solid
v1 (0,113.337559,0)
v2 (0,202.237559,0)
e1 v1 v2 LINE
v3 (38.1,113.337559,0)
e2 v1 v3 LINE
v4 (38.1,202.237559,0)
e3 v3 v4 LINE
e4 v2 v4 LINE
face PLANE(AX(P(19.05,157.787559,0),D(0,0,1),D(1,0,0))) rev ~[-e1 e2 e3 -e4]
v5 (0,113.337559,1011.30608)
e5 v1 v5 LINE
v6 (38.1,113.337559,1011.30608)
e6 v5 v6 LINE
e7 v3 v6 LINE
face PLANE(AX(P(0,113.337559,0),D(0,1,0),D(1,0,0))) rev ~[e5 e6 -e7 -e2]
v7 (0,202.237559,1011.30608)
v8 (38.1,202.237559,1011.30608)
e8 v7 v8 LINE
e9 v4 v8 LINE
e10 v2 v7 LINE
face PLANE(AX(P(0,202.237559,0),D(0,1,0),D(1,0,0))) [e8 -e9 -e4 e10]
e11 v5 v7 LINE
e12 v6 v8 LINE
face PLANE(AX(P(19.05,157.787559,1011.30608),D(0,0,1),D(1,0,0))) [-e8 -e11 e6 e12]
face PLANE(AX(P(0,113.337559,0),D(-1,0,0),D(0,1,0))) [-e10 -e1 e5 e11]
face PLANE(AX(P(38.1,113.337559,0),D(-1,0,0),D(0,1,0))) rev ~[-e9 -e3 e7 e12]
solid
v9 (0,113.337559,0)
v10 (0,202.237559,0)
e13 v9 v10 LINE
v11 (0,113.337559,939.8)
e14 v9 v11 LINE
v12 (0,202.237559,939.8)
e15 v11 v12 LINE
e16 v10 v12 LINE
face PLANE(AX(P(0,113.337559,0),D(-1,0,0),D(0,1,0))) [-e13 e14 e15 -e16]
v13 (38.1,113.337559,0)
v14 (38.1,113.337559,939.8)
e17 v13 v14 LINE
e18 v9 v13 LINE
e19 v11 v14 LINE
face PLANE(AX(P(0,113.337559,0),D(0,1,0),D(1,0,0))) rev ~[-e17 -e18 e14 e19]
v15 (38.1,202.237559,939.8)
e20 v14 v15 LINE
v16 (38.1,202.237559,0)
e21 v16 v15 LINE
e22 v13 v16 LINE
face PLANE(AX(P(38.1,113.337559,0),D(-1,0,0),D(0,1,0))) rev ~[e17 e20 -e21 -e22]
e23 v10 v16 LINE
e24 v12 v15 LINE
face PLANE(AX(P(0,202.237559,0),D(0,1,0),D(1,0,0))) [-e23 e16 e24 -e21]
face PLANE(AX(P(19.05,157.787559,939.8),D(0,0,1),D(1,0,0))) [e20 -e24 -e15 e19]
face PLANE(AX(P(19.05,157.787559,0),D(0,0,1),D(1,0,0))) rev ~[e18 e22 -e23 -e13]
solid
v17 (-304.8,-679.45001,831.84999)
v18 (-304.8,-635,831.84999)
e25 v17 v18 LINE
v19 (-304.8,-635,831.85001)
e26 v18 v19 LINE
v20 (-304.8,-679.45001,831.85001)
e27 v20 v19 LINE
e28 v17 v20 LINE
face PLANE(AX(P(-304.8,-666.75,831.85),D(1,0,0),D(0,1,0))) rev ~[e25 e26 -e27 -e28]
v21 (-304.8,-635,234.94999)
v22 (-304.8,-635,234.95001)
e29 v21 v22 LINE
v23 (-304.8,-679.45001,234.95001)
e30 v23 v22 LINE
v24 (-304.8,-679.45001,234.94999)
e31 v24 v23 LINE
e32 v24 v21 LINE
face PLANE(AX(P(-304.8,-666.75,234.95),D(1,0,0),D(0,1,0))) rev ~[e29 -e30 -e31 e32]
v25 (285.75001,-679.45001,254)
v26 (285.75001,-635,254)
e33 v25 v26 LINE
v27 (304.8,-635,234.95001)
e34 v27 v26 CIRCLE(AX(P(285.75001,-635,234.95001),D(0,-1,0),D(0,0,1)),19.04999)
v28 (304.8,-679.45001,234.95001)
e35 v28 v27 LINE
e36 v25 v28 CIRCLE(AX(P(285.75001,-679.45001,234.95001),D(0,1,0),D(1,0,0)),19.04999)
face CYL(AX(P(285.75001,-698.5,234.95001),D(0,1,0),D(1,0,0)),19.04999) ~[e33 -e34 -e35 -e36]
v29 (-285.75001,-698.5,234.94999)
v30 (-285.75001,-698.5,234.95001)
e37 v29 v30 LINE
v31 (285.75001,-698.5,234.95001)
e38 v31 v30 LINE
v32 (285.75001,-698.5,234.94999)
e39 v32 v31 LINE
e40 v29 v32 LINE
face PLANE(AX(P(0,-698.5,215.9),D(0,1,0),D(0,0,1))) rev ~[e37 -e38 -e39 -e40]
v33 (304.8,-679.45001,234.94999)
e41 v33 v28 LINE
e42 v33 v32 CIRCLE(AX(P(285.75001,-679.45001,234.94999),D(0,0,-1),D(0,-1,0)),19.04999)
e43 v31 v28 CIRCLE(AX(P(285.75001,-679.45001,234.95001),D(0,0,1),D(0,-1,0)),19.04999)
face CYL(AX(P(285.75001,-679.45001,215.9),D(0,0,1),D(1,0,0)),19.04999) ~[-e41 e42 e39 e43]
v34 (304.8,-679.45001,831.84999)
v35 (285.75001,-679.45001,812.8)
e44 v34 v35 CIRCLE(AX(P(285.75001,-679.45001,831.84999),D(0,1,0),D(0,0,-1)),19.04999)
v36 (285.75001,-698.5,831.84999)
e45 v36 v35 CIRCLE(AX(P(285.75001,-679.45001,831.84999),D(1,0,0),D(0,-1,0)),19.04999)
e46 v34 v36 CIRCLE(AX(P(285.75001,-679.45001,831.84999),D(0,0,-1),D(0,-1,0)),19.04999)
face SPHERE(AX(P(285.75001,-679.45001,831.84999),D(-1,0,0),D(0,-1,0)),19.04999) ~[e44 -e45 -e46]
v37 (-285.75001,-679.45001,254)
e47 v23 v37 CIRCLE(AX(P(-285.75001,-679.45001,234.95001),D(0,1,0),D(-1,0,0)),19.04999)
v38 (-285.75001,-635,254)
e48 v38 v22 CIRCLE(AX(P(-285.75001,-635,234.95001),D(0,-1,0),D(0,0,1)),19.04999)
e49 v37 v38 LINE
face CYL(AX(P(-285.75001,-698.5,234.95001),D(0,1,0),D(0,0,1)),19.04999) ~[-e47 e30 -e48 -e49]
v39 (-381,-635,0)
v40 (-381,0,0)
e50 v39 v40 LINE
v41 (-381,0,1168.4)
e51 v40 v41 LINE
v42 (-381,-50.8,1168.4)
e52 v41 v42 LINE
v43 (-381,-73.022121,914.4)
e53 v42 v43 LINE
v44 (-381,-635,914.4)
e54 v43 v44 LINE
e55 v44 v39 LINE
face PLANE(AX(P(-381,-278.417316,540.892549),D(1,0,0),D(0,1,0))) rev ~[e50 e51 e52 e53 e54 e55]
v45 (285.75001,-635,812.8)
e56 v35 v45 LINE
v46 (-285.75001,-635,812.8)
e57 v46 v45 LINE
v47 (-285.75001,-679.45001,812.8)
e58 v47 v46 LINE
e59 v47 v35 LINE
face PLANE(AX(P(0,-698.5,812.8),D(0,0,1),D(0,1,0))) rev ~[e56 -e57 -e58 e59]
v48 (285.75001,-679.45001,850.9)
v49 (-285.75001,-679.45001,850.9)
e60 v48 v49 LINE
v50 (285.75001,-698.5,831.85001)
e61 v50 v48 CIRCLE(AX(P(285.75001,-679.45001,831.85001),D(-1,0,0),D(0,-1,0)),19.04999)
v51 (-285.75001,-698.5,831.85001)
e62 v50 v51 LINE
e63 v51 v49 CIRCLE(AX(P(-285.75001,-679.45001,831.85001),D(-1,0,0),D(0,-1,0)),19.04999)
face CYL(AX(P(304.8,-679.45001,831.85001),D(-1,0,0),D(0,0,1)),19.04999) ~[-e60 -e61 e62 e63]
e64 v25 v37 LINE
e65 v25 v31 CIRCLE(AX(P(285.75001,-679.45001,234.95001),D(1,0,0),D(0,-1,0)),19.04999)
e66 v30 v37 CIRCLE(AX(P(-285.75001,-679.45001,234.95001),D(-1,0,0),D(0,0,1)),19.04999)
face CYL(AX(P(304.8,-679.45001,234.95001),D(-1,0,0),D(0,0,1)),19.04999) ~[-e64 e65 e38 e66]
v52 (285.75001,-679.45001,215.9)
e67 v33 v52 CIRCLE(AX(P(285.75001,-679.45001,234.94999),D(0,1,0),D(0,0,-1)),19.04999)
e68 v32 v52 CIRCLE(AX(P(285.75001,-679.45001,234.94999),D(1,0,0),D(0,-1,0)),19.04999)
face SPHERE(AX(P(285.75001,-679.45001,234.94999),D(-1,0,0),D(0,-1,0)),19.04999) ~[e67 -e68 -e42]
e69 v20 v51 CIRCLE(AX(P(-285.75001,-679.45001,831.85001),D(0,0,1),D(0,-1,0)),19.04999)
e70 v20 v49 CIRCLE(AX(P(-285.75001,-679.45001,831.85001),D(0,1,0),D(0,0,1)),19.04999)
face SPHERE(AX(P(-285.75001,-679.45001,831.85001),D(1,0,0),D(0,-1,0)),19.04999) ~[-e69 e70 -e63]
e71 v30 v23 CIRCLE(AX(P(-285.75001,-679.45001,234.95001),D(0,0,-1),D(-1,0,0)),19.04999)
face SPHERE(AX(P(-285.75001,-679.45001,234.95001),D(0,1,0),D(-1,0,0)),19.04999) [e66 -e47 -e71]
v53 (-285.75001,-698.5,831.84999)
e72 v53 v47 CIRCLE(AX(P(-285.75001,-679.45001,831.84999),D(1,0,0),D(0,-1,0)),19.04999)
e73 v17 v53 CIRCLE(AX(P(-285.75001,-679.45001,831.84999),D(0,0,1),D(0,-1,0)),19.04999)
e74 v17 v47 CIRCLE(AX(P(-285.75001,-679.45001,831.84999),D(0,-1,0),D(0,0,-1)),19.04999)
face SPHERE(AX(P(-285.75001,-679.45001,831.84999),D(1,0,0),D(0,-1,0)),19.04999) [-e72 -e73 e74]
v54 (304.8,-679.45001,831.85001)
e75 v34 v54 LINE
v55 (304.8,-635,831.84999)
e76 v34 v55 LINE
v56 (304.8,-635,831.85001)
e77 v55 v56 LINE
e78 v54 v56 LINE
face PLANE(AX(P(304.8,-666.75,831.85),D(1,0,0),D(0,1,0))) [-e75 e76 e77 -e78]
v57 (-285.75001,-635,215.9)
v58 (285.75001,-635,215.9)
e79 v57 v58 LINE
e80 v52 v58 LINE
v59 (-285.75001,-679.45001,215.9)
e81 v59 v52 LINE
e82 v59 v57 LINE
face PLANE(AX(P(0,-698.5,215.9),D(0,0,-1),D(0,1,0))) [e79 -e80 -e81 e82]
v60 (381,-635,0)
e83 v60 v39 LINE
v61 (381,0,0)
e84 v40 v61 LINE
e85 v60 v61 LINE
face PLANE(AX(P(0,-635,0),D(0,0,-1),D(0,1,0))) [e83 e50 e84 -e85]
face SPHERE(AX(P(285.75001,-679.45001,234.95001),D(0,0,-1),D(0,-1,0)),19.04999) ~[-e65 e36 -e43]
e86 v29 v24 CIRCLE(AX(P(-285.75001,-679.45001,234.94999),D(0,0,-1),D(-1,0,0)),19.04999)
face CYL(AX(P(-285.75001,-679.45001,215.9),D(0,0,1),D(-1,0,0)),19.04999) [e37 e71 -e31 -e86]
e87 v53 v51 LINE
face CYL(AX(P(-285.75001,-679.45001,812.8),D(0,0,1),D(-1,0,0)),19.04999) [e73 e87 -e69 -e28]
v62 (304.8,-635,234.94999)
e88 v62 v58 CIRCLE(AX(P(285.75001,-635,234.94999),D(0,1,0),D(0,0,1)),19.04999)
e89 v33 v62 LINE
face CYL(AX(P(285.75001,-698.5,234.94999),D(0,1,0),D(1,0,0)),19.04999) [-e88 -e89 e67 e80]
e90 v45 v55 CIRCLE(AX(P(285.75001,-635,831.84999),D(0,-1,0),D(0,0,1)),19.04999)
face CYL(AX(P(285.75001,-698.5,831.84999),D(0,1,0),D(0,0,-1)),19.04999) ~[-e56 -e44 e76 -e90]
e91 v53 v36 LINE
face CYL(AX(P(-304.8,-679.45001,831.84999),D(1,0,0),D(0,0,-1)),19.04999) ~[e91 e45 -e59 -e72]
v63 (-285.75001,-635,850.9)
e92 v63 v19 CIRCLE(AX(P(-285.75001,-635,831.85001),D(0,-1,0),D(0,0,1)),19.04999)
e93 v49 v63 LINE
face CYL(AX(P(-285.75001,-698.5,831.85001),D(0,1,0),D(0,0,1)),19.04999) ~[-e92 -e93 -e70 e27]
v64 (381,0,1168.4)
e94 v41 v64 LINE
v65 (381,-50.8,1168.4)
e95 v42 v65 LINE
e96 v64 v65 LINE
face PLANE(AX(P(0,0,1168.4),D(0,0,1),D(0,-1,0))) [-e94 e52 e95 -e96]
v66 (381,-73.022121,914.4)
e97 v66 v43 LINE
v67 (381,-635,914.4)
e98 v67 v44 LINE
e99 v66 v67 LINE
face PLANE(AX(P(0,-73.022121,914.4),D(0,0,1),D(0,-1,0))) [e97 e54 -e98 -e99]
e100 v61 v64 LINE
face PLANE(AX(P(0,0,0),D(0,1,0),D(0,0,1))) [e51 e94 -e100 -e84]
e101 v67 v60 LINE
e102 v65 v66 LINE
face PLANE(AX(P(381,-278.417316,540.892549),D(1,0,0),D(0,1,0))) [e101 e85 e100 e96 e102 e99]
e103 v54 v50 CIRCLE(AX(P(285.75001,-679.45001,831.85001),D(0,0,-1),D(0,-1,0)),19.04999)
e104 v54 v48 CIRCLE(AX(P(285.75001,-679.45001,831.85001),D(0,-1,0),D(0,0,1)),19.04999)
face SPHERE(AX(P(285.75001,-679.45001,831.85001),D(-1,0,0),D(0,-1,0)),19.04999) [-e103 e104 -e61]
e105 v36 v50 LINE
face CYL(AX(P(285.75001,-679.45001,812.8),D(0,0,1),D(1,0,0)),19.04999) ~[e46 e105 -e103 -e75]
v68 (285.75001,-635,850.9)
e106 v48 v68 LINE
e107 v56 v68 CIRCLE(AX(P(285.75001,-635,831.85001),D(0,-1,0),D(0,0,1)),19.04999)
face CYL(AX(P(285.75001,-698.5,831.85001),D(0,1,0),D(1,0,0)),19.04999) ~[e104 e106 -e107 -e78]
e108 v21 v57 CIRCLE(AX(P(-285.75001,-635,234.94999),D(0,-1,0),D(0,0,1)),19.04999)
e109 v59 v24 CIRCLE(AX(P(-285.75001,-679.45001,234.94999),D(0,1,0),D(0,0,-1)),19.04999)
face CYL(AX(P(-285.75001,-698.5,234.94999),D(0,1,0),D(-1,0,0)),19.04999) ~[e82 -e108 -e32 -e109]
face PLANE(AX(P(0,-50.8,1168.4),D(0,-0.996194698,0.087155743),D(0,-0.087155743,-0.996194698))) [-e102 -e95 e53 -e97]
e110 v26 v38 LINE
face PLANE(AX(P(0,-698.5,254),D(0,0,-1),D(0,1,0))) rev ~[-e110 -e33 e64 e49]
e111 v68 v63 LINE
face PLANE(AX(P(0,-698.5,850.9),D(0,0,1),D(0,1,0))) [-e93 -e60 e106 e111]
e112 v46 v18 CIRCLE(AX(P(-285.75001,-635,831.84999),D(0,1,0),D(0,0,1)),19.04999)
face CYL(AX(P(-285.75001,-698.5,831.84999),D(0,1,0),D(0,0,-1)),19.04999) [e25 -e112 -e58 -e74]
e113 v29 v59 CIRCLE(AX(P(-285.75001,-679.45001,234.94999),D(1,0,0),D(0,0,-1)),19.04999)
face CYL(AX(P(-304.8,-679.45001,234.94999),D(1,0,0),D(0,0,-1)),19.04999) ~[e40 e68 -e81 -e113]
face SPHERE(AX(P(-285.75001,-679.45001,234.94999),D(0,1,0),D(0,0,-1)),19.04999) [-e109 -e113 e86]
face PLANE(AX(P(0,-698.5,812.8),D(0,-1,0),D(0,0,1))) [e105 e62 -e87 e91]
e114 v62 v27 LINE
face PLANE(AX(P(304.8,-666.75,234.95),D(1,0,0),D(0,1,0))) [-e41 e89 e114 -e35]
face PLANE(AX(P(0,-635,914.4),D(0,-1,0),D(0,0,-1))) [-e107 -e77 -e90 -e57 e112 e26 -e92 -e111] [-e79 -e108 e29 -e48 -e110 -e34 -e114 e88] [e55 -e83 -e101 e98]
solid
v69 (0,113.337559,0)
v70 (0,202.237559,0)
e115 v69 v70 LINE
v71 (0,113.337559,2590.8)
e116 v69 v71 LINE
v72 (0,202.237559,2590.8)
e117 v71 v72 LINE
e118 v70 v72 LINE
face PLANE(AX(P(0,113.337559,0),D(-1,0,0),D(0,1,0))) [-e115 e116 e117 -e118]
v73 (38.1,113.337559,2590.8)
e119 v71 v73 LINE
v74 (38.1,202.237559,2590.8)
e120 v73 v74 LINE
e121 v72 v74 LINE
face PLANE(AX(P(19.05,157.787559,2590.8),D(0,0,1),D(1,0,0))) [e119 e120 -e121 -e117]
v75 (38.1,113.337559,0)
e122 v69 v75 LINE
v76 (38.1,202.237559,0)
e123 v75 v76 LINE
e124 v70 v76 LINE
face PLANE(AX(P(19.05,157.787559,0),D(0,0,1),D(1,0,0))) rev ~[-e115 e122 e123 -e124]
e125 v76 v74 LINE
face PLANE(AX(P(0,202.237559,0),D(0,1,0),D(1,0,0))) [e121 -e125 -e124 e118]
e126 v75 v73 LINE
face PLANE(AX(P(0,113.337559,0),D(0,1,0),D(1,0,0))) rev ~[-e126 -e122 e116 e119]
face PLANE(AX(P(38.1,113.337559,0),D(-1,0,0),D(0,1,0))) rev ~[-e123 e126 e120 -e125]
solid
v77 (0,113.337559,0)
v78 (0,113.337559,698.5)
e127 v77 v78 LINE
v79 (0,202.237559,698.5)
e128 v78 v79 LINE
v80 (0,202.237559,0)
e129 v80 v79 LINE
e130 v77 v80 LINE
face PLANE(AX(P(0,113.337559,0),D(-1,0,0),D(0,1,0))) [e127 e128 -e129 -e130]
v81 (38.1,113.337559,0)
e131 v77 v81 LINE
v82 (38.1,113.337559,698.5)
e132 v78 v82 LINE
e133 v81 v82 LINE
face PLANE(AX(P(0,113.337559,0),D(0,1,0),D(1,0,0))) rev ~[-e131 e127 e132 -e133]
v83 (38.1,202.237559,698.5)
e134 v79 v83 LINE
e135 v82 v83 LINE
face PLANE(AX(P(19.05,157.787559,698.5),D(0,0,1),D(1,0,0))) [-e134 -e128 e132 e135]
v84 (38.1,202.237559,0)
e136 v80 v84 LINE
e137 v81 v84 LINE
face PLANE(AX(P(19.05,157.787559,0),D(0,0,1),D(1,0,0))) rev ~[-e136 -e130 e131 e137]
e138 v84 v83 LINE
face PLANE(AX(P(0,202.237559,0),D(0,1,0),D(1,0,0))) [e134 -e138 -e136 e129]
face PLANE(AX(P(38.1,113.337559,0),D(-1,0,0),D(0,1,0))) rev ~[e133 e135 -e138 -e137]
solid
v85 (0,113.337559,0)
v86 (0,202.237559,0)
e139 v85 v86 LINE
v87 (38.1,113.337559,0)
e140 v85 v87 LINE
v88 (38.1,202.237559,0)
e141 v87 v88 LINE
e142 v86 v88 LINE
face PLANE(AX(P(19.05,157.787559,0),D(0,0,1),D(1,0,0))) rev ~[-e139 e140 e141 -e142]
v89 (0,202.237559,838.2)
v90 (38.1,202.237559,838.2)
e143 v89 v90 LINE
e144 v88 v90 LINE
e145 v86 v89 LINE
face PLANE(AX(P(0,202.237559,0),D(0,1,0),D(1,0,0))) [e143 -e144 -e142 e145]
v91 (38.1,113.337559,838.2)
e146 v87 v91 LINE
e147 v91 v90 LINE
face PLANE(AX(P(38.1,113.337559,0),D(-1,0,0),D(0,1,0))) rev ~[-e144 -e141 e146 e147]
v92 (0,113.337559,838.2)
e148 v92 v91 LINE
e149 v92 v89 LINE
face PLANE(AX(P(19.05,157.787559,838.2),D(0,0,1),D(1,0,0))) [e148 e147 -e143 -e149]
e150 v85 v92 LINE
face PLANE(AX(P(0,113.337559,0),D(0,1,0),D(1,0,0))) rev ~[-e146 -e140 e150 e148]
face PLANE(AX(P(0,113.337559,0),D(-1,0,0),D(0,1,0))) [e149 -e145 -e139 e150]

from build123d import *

# Parameters (mm, degrees)
F1_DEPTH  = 381
F2_W      = 63.5
F2_H      = 38.1
F3_DEPTH  = 304.8
F4_R      = 19.04999
F5_W      = 38.1
F5_H      = 88.9
F6_DEPTH  = 838.2
F7_DEPTH  = 2590.8
F8_DEPTH  = 939.8
F9_DEPTH  = 1011.30608
F10_DEPTH = 698.5


# Not quite as in the source:
# - a fillet or chamfer is up to 0.001 mm smaller than in the source, because OpenCascade refuses the exact size


with BuildPart() as f1:
    # F0 (on Right) → F1 (new body, symmetric)
    with BuildSketch(Plane.YZ):
        Polygon((-635, 0), (0, 0), (0, 1168.4), (-50.8, 1168.4), (-73.0221205356, 914.4), (-635, 914.4), align=None)
    extrude(amount=F1_DEPTH, both=True)

    # F2 (on Right) → F3 (join, symmetric)
    with BuildSketch(Plane.YZ):
        with Locations((-666.75, 831.85)):
            Rectangle(F2_W, F2_H)
        with Locations((-666.75, 234.95)):
            Rectangle(F2_W, F2_H)
    extrude(amount=F3_DEPTH, both=True)

    # F4 (radius 19.05 in the source; OpenCascade refuses exactly that, so slightly less here)
    f4_edges = [f1.edges().sort_by_distance(p)[0] for p in [
        (0, -698.5, 850.9),
        (0, -698.5, 812.8),
        (-304.8, -698.5, 831.85),
        (304.8, -698.5, 831.85),
        (304.8, -666.75, 850.9),
        (304.8, -666.75, 812.8),
        (-304.8, -666.75, 850.9),
        (-304.8, -666.75, 812.8),
        (-304.8, -666.75, 254),
        (-304.8, -666.75, 215.9),
        (0, -698.5, 215.9),
        (-304.8, -698.5, 234.95),
        (304.8, -698.5, 234.95),
        (0, -698.5, 254),
        (304.8, -666.75, 254),
        (304.8, -666.75, 215.9),
    ]]
    fillet(f4_edges, radius=F4_R)


with BuildPart() as f6:
    # F5 (on Top) → F6 (new body)
    with BuildSketch(Plane.XY):
        with Locations((19.05, 157.7875594588)):
            Rectangle(F5_W, F5_H)
    extrude(amount=F6_DEPTH)


with BuildPart() as f7:
    # F5 (on Top) → F7 (new body)
    with BuildSketch(Plane.XY):
        with Locations((19.05, 157.7875594588)):
            Rectangle(F5_W, F5_H)
    extrude(amount=F7_DEPTH)


with BuildPart() as f8:
    # F5 (on Top) → F8 (new body)
    with BuildSketch(Plane.XY):
        with Locations((19.05, 157.7875594588)):
            Rectangle(F5_W, F5_H)
    extrude(amount=F8_DEPTH)


with BuildPart() as f9:
    # F5 (on Top) → F9 (new body)
    with BuildSketch(Plane.XY):
        with Locations((19.05, 157.7875594588)):
            Rectangle(F5_W, F5_H)
    extrude(amount=F9_DEPTH)


with BuildPart() as f10:
    # F5 (on Top) → F10 (new body)
    with BuildSketch(Plane.XY):
        with Locations((19.05, 157.7875594588)):
            Rectangle(F5_W, F5_H)
    extrude(amount=F10_DEPTH)


solid = Compound([f1.part, f6.part, f7.part, f8.part, f9.part, f10.part])
